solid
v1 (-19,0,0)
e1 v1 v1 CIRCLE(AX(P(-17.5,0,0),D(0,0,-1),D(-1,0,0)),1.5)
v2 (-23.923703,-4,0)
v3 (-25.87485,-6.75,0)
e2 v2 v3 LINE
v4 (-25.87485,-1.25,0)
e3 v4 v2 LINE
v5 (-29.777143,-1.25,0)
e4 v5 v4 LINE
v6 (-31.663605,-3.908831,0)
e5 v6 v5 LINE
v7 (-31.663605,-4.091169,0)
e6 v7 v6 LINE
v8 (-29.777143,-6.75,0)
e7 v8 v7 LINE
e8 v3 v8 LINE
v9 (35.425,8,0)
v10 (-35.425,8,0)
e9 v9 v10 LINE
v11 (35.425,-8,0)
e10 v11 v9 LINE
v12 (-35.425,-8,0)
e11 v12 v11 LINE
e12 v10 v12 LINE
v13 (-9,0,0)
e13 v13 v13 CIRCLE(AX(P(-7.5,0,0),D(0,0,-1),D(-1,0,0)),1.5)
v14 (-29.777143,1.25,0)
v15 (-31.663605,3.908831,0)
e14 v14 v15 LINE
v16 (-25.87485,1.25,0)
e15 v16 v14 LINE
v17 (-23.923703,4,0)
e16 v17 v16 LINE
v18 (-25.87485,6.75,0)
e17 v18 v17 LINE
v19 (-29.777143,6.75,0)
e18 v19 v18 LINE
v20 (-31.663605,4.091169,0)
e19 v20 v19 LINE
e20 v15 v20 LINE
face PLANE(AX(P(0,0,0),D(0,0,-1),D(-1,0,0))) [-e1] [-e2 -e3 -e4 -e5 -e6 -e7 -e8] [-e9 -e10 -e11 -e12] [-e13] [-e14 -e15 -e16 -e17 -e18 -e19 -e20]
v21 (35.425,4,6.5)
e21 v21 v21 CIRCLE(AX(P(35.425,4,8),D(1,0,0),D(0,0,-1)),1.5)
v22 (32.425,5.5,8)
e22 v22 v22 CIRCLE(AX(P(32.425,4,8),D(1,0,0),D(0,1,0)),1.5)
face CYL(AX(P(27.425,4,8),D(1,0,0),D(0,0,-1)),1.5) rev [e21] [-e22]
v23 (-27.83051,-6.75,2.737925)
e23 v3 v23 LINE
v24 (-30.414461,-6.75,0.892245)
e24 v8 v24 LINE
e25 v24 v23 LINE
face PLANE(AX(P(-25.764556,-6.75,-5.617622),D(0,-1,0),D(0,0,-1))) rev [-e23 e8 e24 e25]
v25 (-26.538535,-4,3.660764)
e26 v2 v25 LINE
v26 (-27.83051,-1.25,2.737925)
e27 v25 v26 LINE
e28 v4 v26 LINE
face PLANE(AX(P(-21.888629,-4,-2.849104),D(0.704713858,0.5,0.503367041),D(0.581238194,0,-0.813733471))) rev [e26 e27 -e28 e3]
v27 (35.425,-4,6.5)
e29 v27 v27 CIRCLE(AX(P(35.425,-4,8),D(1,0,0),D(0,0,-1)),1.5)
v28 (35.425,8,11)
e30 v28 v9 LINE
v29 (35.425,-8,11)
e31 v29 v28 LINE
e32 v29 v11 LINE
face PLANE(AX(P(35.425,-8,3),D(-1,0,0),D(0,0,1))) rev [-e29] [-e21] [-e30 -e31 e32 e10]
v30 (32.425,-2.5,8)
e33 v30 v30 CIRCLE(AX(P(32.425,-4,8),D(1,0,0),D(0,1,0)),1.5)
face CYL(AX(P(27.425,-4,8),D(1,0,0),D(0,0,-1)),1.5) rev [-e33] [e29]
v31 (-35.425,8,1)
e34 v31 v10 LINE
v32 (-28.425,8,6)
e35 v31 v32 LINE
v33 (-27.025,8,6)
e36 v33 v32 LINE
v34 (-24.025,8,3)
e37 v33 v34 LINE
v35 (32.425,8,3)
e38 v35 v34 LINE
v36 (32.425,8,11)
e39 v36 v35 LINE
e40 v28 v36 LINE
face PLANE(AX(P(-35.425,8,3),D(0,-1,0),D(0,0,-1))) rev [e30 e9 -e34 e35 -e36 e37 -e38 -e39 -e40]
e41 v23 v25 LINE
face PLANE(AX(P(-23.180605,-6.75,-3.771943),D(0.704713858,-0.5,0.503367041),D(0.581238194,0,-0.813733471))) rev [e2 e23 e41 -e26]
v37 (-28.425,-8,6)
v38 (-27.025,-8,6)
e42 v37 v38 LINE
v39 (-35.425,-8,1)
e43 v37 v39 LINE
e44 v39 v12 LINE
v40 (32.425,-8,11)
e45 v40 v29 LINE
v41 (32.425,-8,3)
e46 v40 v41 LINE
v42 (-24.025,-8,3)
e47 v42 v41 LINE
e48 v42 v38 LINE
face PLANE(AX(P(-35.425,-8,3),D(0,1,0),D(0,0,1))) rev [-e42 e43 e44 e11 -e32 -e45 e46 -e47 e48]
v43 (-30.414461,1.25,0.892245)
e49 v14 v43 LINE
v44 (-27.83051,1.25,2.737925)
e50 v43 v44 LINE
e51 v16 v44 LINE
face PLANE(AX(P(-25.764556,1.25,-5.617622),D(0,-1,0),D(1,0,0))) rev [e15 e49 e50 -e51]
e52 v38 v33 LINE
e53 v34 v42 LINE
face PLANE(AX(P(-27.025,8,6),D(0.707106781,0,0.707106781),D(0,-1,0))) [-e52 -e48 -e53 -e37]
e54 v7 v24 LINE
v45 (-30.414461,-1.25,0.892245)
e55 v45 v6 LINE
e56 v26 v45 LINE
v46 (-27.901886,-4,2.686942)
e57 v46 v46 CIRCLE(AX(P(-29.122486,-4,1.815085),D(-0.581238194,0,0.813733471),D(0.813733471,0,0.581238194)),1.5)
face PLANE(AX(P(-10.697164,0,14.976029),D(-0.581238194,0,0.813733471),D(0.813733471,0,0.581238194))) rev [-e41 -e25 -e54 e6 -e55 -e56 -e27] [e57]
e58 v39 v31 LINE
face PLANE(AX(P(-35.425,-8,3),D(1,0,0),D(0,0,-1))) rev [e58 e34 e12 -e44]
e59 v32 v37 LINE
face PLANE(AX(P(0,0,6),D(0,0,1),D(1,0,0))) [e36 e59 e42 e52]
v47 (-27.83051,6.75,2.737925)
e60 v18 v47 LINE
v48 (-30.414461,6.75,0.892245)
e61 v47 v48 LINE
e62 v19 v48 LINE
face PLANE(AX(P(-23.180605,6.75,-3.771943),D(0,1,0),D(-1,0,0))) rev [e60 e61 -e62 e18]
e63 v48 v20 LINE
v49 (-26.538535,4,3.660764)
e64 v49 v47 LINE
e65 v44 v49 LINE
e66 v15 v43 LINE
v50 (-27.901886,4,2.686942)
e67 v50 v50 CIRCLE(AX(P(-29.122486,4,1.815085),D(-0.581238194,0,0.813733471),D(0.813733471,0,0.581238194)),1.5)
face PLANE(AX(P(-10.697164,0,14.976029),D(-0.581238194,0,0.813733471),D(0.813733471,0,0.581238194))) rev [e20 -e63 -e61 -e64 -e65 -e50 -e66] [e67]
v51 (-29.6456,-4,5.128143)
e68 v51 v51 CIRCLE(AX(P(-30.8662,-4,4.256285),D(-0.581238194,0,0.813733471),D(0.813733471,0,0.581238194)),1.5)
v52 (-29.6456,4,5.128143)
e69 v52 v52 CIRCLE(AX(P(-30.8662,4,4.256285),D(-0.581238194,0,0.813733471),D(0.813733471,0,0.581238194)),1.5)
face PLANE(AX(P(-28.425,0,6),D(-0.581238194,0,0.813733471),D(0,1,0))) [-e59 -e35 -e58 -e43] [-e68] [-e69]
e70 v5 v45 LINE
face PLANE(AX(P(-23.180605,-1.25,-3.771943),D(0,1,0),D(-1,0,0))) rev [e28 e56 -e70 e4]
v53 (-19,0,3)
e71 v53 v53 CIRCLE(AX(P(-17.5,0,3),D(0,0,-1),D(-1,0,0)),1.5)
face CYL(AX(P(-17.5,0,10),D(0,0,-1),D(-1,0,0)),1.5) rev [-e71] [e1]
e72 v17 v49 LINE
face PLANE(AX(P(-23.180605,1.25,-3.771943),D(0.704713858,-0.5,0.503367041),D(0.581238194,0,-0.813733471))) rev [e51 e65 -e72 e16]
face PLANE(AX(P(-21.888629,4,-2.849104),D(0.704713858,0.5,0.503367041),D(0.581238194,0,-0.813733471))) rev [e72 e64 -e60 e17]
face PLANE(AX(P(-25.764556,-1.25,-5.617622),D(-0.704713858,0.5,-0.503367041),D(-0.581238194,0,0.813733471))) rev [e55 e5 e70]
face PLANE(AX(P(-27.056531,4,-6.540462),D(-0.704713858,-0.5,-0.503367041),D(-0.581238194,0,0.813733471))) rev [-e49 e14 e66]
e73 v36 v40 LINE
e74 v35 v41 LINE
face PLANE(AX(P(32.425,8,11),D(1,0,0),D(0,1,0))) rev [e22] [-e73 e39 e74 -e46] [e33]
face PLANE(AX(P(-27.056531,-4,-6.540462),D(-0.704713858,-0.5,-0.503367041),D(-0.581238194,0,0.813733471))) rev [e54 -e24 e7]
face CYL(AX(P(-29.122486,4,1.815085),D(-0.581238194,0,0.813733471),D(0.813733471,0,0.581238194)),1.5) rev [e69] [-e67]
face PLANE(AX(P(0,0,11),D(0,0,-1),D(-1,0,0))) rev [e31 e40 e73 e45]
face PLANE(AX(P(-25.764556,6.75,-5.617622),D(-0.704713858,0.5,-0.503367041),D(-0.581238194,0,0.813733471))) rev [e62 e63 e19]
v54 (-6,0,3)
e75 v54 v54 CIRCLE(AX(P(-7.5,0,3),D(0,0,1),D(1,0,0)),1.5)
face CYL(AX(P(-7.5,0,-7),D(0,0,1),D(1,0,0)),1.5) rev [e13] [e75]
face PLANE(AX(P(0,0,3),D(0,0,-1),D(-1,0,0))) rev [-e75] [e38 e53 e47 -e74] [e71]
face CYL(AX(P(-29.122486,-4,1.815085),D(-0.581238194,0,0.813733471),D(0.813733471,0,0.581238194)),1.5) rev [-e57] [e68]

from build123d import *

# Parameters (mm, degrees)
SKETCH1_W           = 70.85
SKETCH1_H           = 16
BOSS_EXTRUDE1_DEPTH = 3
SKETCH2_W           = 8.4
SKETCH2_H           = 16
BOSS_EXTRUDE2_DEPTH = 3
CHAMFER1_SIZE       = 5
CHAMFER1_SIZE2      = 7
SKETCH3_R           = 1.5
CUT_EXTRUDE1_DEPTH  = 3
CHAMFER2_SIZE       = 3
CUT_EXTRUDE2_START  = -3
CUT_EXTRUDE2_DEPTH  = 8
SKETCH5_W           = 3
SKETCH5_H           = 16
BOSS_EXTRUDE3_DEPTH = 8
SKETCH6_R           = 1.5
CUT_EXTRUDE3_DEPTH  = 8
SKETCH7_R           = 1.5
CUT_EXTRUDE4_DEPTH  = 10
SKETCH8_R           = 1.5
CUT_EXTRUDE5_DEPTH  = 10


with BuildPart() as part:
    # Sketch1 → Boss-Extrude1 (new body)
    with BuildSketch(Plane.XY):
        Rectangle(SKETCH1_W, SKETCH1_H)
    extrude(amount=BOSS_EXTRUDE1_DEPTH)

    # Sketch2 → Boss-Extrude2 (add)
    with BuildSketch(Plane.XY.offset(3)):
        with Locations((-31.225, 0)):
            Rectangle(SKETCH2_W, SKETCH2_H)
    extrude(amount=BOSS_EXTRUDE2_DEPTH)

    # Chamfer1
    chamfer1_edges = [part.edges().sort_by_distance(p)[0] for p in [
        (-35.425, 0, 6),
    ]]
    chamfer1_side = [part.faces().sort_by_distance(p)[0] for p in [
        (-35.425, 0, 3),
    ]]
    chamfer(chamfer1_edges, length=CHAMFER1_SIZE, length2=CHAMFER1_SIZE2, reference=chamfer1_side[0])

    # Sketch3 → Cut-Extrude1 (cut)
    with BuildSketch(Plane(origin=(-12.440878378, 0, 17.41722973), x_dir=(0.8137334712067354, 0, 0.5812381937190957), z_dir=(-0.5812381937190957, 0, 0.8137334712067354))):
        with Locations((-22.642944757, 4)):
            Circle(SKETCH3_R)
        with Locations((-22.642944757, -4)):
            Circle(SKETCH3_R)
    extrude(amount=-CUT_EXTRUDE1_DEPTH, mode=Mode.SUBTRACT)

    # Chamfer2
    chamfer2_edges = [part.edges().sort_by_distance(p)[0] for p in [
        (-27.025, 0, 3),
    ]]
    chamfer(chamfer2_edges, length=CHAMFER2_SIZE - 0.0001)  # a hair under: the kernel refuses the full size

    # Sketch4 → Cut-Extrude2 (cut)
    with BuildSketch(Plane(origin=(-12.440878378, 0, 17.41722973), x_dir=(0.8137334712067354, 0, 0.5812381937190959), z_dir=(-0.5812381937190958, 0, 0.8137334712067353)).offset(CUT_EXTRUDE2_START)):
        Polygon((-19.467518276, 4), (-21.055231516, 6.75), (-24.230657997, 6.75), (-25.818371237, 4), (-24.230657997, 1.25), (-21.055231516, 1.25), align=None)
        Polygon((-19.467518276, -4), (-21.055231516, -1.25), (-24.230657997, -1.25), (-25.818371237, -4), (-24.230657997, -6.75), (-21.055231516, -6.75), align=None)
    extrude(amount=-CUT_EXTRUDE2_DEPTH, mode=Mode.SUBTRACT)

    # Sketch5 → Boss-Extrude3 (add)
    with BuildSketch(Plane.XY.offset(3)):
        with Locations((33.925, 0)):
            Rectangle(SKETCH5_W, SKETCH5_H)
    extrude(amount=BOSS_EXTRUDE3_DEPTH)

    # Sketch6 → Cut-Extrude3 (cut)
    with BuildSketch(Plane(origin=(35.425, 0, 0), x_dir=(0, 0, -1), z_dir=(1, 0, 0))):
        with Locations((-8, 4)):
            Circle(SKETCH6_R)
        with Locations((-8, -4)):
            Circle(SKETCH6_R)
    extrude(amount=-CUT_EXTRUDE3_DEPTH, mode=Mode.SUBTRACT)

    # Sketch7 → Cut-Extrude4 (cut)
    with BuildSketch(Plane(origin=(0, 0, 0), x_dir=(-1, 0, 0), z_dir=(0, 0, -1))):
        with Locations((17.5, 0)):
            Circle(SKETCH7_R)
    extrude(amount=-CUT_EXTRUDE4_DEPTH, mode=Mode.SUBTRACT)

    # Sketch8 → Cut-Extrude5 (cut)
    with BuildSketch(Plane.XY.offset(3)):
        with Locations((-7.5, 0)):
            Circle(SKETCH8_R)
    extrude(amount=-CUT_EXTRUDE5_DEPTH, mode=Mode.SUBTRACT)


solid = part.part
